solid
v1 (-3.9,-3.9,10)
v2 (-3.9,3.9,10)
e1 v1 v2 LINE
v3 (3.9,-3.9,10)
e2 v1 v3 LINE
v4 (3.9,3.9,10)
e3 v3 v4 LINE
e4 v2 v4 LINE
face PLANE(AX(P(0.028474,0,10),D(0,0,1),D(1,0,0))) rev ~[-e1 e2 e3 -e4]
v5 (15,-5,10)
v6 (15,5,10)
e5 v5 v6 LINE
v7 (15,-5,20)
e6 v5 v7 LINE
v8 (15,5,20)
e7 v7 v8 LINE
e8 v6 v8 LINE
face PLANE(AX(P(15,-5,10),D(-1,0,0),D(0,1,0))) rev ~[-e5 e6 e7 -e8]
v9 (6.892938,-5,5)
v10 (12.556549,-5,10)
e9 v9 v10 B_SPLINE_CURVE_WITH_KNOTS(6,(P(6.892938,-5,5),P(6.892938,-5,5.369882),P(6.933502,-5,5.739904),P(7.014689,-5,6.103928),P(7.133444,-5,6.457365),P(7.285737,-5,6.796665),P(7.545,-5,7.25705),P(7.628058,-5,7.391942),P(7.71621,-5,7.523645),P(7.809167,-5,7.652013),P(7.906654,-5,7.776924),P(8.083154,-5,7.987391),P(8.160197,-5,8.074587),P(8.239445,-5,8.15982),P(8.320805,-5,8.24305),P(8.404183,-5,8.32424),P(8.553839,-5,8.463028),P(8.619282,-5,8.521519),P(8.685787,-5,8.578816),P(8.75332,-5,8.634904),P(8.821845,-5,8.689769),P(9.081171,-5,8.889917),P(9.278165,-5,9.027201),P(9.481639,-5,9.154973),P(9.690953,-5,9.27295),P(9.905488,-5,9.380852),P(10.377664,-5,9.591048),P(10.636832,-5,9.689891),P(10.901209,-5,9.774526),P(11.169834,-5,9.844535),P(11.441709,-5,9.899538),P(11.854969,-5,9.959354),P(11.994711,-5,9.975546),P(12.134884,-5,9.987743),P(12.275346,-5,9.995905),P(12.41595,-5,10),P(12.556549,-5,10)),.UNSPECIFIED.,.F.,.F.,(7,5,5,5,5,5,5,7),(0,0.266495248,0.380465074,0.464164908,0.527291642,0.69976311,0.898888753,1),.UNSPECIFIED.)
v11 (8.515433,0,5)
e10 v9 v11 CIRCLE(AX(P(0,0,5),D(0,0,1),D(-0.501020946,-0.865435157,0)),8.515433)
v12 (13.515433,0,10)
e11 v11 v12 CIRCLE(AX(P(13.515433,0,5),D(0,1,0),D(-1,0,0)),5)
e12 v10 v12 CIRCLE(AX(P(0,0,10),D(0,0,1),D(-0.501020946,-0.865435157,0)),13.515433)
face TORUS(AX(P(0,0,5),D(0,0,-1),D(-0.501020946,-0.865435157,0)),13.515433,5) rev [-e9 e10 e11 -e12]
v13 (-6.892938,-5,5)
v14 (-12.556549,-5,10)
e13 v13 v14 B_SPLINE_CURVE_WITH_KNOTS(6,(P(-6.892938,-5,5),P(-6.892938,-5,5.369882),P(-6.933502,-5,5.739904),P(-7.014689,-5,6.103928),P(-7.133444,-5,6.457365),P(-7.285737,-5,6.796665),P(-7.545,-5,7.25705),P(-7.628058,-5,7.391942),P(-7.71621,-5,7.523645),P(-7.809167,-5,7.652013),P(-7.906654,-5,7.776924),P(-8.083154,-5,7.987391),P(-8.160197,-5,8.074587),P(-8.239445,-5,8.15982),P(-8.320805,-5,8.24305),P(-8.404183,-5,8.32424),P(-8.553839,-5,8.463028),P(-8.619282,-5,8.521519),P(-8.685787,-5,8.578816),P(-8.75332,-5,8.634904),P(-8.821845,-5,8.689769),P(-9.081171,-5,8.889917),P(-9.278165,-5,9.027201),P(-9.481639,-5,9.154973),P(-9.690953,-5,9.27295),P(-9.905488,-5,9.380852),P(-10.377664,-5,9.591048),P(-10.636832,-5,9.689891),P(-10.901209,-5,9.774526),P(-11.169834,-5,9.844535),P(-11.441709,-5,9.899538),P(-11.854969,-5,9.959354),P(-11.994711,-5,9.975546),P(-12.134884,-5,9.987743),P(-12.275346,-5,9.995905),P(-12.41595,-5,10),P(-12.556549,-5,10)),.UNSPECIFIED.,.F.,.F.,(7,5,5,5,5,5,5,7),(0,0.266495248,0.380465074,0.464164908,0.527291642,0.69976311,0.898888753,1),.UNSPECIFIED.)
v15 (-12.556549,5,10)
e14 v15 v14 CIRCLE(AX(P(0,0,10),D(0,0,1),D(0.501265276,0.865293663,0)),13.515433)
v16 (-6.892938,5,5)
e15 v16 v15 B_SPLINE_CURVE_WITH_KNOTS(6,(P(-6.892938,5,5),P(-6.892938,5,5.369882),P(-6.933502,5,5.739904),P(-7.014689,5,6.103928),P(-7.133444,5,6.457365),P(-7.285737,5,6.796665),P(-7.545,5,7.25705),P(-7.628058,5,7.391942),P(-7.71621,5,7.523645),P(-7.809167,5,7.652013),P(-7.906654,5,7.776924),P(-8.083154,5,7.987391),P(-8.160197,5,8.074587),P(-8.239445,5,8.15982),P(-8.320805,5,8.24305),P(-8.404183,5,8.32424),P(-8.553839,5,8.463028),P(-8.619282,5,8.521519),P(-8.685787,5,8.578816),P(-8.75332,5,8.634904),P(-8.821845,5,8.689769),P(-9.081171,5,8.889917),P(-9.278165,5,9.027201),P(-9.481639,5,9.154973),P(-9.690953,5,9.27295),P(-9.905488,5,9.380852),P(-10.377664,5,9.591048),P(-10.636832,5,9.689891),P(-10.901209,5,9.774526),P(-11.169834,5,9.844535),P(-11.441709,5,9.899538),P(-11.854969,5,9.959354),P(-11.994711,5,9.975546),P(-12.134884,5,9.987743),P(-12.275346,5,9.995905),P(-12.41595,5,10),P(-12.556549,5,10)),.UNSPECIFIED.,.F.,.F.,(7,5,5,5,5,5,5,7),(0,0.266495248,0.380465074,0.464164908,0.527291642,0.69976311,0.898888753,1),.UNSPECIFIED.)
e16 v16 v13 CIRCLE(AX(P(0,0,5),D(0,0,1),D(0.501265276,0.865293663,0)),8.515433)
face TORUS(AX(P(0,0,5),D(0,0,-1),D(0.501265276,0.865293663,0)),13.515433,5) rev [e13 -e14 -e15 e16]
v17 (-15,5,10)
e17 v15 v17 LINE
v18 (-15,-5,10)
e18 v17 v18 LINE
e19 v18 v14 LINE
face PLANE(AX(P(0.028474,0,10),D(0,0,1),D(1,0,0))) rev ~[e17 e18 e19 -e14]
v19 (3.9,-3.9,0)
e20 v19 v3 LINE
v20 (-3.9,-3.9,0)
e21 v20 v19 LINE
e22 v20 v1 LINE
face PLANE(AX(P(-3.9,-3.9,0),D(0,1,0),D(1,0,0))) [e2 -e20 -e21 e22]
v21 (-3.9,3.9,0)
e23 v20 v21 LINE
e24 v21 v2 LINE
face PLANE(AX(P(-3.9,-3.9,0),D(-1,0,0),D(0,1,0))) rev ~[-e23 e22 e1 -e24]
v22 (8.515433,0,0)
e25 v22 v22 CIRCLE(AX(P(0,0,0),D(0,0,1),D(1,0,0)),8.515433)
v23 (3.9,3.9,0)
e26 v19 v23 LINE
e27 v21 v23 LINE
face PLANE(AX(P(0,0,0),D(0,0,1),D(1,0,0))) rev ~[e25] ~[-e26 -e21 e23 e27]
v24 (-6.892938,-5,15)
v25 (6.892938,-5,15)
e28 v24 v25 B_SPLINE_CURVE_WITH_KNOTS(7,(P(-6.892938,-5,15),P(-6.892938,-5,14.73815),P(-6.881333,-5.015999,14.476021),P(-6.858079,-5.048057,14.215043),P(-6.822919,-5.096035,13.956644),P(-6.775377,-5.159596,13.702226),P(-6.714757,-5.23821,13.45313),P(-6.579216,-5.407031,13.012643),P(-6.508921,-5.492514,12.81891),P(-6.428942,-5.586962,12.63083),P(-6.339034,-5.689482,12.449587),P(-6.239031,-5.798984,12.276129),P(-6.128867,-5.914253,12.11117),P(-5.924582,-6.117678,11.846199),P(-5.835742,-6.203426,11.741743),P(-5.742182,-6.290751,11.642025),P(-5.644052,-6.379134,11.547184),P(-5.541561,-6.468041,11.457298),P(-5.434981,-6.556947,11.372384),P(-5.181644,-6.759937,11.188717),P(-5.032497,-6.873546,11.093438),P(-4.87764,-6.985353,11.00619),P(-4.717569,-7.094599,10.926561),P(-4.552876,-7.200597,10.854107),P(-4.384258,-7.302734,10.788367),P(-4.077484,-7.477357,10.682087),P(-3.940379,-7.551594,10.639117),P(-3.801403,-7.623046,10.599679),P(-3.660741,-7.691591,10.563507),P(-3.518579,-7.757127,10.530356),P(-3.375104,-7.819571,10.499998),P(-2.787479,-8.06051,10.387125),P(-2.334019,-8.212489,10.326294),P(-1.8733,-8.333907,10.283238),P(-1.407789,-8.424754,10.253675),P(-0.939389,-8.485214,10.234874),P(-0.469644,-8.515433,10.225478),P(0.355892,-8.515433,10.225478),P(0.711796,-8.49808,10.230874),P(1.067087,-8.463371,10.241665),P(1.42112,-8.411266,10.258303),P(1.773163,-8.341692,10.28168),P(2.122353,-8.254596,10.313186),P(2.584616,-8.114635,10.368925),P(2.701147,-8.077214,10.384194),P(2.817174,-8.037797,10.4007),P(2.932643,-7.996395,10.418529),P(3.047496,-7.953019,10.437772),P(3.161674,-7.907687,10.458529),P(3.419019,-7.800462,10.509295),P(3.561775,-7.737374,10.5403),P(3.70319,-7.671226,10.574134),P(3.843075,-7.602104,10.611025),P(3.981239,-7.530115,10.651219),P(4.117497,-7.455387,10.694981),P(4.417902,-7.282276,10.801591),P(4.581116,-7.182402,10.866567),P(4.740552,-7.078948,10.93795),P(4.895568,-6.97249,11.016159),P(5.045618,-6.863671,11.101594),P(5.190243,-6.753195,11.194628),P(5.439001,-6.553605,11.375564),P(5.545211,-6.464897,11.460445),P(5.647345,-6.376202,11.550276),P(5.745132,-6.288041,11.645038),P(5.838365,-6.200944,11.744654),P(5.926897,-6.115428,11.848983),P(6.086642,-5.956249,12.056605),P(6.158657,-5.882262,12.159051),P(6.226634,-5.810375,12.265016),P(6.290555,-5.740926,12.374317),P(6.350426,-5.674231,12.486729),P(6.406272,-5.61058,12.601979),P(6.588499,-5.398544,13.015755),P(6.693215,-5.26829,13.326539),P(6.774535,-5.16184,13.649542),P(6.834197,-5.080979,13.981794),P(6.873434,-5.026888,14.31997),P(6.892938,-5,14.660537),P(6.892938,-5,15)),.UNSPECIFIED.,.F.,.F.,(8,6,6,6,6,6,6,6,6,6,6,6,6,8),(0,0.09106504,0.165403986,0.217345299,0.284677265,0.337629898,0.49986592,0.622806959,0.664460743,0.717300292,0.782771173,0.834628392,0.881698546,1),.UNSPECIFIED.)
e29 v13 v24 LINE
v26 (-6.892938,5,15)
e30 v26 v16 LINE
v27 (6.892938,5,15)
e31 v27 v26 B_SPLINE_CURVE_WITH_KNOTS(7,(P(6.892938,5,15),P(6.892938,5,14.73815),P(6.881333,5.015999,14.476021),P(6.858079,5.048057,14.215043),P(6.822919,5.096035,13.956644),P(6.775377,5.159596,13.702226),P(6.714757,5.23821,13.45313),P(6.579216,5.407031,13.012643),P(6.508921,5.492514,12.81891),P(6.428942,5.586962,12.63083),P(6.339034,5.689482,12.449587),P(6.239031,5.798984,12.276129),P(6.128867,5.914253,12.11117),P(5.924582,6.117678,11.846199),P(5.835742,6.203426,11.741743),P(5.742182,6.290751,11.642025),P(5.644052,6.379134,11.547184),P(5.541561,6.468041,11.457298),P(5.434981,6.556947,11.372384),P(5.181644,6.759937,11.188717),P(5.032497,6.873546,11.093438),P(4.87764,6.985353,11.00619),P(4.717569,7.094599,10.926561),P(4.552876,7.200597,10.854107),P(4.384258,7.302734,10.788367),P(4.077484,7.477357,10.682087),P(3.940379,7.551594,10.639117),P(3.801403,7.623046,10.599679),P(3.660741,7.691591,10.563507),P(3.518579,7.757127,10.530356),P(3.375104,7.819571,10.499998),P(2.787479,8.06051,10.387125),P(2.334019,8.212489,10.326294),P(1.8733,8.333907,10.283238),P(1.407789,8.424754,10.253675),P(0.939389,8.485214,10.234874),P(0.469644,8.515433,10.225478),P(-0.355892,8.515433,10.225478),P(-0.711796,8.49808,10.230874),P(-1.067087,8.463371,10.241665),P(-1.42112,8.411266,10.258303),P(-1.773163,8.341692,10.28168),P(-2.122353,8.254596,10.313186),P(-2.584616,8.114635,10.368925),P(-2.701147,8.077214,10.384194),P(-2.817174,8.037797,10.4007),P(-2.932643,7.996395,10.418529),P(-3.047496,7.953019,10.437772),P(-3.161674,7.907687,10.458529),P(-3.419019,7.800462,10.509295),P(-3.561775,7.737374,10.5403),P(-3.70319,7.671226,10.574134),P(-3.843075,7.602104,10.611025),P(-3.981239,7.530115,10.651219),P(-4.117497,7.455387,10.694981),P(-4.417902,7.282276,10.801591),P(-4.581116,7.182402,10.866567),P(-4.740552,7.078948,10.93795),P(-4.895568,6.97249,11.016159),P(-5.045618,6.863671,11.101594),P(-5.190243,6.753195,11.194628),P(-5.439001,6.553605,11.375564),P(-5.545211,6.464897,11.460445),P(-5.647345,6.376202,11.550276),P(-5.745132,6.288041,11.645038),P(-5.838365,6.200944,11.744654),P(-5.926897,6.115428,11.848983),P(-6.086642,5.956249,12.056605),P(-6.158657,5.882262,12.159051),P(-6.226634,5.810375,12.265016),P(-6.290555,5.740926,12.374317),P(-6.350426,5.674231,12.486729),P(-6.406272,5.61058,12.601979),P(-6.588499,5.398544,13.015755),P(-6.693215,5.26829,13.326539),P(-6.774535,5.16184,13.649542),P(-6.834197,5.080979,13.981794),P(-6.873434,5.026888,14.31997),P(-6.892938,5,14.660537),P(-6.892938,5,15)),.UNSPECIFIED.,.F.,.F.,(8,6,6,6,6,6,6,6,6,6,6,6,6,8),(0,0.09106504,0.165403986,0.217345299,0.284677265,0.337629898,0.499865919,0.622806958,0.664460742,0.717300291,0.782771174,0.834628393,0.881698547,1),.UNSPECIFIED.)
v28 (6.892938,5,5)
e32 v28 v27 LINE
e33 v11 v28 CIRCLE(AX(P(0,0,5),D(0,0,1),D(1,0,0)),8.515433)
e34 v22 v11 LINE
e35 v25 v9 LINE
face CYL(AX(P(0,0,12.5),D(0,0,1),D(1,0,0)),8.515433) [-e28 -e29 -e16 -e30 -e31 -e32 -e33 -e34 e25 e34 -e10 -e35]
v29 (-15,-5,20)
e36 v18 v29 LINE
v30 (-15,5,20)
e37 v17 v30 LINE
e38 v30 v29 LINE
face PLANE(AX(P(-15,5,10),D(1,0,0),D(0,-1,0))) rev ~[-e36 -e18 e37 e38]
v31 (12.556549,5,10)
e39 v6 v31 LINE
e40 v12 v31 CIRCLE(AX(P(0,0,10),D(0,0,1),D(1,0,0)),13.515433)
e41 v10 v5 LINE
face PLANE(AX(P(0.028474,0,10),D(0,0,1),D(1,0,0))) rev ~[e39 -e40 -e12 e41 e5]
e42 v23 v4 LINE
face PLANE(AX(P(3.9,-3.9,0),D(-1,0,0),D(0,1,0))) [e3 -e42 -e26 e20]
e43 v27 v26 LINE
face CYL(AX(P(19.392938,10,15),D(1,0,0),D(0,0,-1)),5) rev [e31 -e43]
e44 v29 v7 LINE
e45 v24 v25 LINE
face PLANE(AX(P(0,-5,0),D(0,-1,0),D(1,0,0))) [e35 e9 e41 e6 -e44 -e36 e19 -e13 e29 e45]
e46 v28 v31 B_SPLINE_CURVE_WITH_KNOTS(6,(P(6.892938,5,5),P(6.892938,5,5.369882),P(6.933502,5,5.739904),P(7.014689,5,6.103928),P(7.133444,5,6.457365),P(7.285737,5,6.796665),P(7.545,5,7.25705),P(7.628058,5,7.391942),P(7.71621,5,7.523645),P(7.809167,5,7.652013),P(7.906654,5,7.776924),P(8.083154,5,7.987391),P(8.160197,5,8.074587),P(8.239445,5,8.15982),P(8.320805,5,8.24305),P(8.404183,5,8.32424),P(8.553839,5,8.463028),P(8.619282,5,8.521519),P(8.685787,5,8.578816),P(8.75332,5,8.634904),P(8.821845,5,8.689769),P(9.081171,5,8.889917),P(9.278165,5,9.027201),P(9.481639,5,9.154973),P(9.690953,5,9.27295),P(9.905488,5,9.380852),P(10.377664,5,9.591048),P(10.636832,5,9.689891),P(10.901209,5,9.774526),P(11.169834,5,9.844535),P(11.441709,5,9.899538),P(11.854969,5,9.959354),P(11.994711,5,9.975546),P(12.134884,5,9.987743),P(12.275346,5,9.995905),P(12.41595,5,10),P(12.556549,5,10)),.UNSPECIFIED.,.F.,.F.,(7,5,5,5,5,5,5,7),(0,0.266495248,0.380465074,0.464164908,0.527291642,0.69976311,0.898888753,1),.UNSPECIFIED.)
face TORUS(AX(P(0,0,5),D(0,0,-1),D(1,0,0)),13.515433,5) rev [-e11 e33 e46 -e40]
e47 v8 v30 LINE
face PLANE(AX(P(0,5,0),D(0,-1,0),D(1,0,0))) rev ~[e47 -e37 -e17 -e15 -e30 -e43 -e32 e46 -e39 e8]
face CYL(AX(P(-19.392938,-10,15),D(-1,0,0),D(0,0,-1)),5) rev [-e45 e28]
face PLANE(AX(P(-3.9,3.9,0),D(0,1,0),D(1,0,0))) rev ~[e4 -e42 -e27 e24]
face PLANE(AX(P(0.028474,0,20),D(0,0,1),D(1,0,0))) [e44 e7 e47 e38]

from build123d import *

# Parameters (mm, degrees)
F0_R         = 8.5154328933
F0_W         = 7.8
F0_H         = 7.8
F1_DEPTH     = 10
F2_W         = 7.8
F2_H         = 7.8
F3_DEPTH     = 10
F4_T4_DEPTH  = 38.7858764479
F4_S5_R      = 8.5154328933
F4_T6_DEPTH  = 21
F4_T10_DEPTH = 38.7858764479
F4_S11_R     = 8.5154328933
F4_T12_DEPTH = 21
F4_T16_ANGLE = 120.0675682876
F4_T21_ANGLE = 240.167490735
F4_T27_ANGLE = 120.0675682876


# Not quite as in the source:
# - a fillet or chamfer that OpenCascade refuses, or shapes differently, is made with other operations: its cross-section is extruded or revolved along the edge and cut away or added
# - two fillets or chamfers of one size are made in one step


with BuildPart() as f1:
    # F0 (on Top) → F1 (new body)
    with BuildSketch(Plane.XY):
        Circle(F0_R)
        Rectangle(F0_W, F0_H, mode=Mode.SUBTRACT)
    extrude(amount=F1_DEPTH)

    # F2 (on face) → F3 (join)
    with BuildSketch(Plane.XY.offset(10)):
        with BuildLine():
            Line((6.892938224, 5), (-6.892938224, 5))
            ThreePointArc((-6.892938224, 5), (-8.5154328933, 0), (-6.892938224, -5))
            Line((-6.892938224, -5), (6.892938224, -5))
            ThreePointArc((6.892938224, -5), (8.0996589509, -2.6283306942), (8.5154328933, 0))
            ThreePointArc((8.5154328933, 0), (8.0996589509, 2.6283306942), (6.892938224, 5))
        make_face()
        Rectangle(F2_W, F2_H, mode=Mode.SUBTRACT)
        with BuildLine():
            Line((-6.892938224, 5), (-15, 5))
            Line((-15, 5), (-15, -5))
            Line((-15, -5), (-6.892938224, -5))
            ThreePointArc((-6.892938224, -5), (-8.5154328933, 0), (-6.892938224, 5))
        make_face()
        with BuildLine():
            Line((15, 5), (6.892938224, 5))
            ThreePointArc((6.892938224, 5), (8.0996589509, 2.6283306942), (8.5154328933, 0))
            ThreePointArc((8.5154328933, 0), (8.0996589509, -2.6283306942), (6.892938224, -5))
            Line((6.892938224, -5), (15, -5))
            Line((15, -5), (15, 5))
        make_face()
        Rectangle(F2_W, F2_H)
    extrude(amount=F3_DEPTH)

    # F4: fillet of radius 5 on 5 edges, made by hand


with BuildPart() as f4_tool2:
    # F4_s3 → F4_t4 (new body)
    with BuildSketch(Plane.YZ.offset(-19.392938224)):
        with BuildLine():
            ThreePointArc((-10, 10), (-6.4644660941, 11.4644660941), (-5, 15))
            Line((-5, 15), (-5, 10))
            Line((-5, 10), (-10, 10))
        make_face()
    extrude(amount=F4_T4_DEPTH)

    # F4_s5 → F4_t6 (intersect, symmetric)
    with BuildSketch(Plane.XY.offset(12.5)):
        Circle(F4_S5_R)
    extrude(amount=F4_T6_DEPTH, both=True, mode=Mode.INTERSECT)


with BuildPart() as f1_1:
    add(f1.part)

    # F4_t1: union F4_tool2
    add(f4_tool2.part)


with BuildPart() as f4_tool8:
    # F4_s9 → F4_t10 (new body)
    with BuildSketch(Plane.YZ.offset(19.392938224)):
        with BuildLine():
            ThreePointArc((10, 10), (6.4644660941, 11.4644660941), (5, 15))
            Line((5, 15), (5, 10))
            Line((5, 10), (10, 10))
        make_face()
    extrude(amount=-F4_T10_DEPTH)

    # F4_s11 → F4_t12 (intersect, symmetric)
    with BuildSketch(Plane.XY.offset(12.5)):
        Circle(F4_S11_R)
    extrude(amount=F4_T12_DEPTH, both=True, mode=Mode.INTERSECT)


with BuildPart() as f1_2:
    add(f1_1.part)

    # F4_t7: union F4_tool8
    add(f4_tool8.part)


with BuildPart() as f4_tool14:
    # F4_s15 → F4_t16 (revolve)
    with BuildSketch(Plane(origin=(0, 0, 0), x_dir=(0, 0, 1), z_dir=(-0.8654351572, 0.5010209464, 0))):
        with BuildLine():
            ThreePointArc((5, -8.5154328933), (8.5355339059, -9.9798989873), (10, -13.5154328933))
            Line((10, -13.5154328933), (10, -8.5154328933))
            Line((10, -8.5154328933), (5, -8.5154328933))
        make_face()
    revolve(axis=Axis((0, 0, 10), (0, 0, 1)), revolution_arc=F4_T16_ANGLE)

    split(bisect_by=Plane.XZ.offset(5), keep=Keep.BOTTOM)


with BuildPart() as f1_3:
    add(f1_2.part)

    # F4_t13: union F4_tool14
    add(f4_tool14.part)


with BuildPart() as f4_tool19:
    # F4_s20 → F4_t21 (revolve)
    with BuildSketch(Plane(origin=(0, 0, 0), x_dir=(0, 0, 1), z_dir=(0.8652936628, -0.5012652762, 0))):
        with BuildLine():
            ThreePointArc((5, -8.5154328933), (8.5355339059, -9.9798989873), (10, -13.5154328933))
            Line((10, -13.5154328933), (10, -8.5154328933))
            Line((10, -8.5154328933), (5, -8.5154328933))
        make_face()
    revolve(axis=Axis((0, 0, 10), (0, 0, 1)), revolution_arc=F4_T21_ANGLE)

    split(bisect_by=Plane.XZ.offset(-5), keep=Keep.TOP)

    split(bisect_by=Plane.XZ.offset(5), keep=Keep.BOTTOM)


with BuildPart() as f1_4:
    add(f1_3.part)

    # F4_t18: union F4_tool19
    add(f4_tool19.part)


with BuildPart() as f4_tool25:
    # F4_s26 → F4_t27 (revolve)
    with BuildSketch(Plane.XZ):
        with BuildLine():
            ThreePointArc((8.5154328933, 5), (9.9798989873, 8.5355339059), (13.5154328933, 10))
            Line((13.5154328933, 10), (8.5154328933, 10))
            Line((8.5154328933, 10), (8.5154328933, 5))
        make_face()
    revolve(axis=Axis((0, 0, 10), (0, 0, 1)), revolution_arc=F4_T27_ANGLE)

    split(bisect_by=Plane.XZ.offset(-5), keep=Keep.TOP)


with BuildPart() as f1_5:
    add(f1_4.part)

    # F4_t24: union F4_tool25
    add(f4_tool25.part)


solid = f1_5.part
